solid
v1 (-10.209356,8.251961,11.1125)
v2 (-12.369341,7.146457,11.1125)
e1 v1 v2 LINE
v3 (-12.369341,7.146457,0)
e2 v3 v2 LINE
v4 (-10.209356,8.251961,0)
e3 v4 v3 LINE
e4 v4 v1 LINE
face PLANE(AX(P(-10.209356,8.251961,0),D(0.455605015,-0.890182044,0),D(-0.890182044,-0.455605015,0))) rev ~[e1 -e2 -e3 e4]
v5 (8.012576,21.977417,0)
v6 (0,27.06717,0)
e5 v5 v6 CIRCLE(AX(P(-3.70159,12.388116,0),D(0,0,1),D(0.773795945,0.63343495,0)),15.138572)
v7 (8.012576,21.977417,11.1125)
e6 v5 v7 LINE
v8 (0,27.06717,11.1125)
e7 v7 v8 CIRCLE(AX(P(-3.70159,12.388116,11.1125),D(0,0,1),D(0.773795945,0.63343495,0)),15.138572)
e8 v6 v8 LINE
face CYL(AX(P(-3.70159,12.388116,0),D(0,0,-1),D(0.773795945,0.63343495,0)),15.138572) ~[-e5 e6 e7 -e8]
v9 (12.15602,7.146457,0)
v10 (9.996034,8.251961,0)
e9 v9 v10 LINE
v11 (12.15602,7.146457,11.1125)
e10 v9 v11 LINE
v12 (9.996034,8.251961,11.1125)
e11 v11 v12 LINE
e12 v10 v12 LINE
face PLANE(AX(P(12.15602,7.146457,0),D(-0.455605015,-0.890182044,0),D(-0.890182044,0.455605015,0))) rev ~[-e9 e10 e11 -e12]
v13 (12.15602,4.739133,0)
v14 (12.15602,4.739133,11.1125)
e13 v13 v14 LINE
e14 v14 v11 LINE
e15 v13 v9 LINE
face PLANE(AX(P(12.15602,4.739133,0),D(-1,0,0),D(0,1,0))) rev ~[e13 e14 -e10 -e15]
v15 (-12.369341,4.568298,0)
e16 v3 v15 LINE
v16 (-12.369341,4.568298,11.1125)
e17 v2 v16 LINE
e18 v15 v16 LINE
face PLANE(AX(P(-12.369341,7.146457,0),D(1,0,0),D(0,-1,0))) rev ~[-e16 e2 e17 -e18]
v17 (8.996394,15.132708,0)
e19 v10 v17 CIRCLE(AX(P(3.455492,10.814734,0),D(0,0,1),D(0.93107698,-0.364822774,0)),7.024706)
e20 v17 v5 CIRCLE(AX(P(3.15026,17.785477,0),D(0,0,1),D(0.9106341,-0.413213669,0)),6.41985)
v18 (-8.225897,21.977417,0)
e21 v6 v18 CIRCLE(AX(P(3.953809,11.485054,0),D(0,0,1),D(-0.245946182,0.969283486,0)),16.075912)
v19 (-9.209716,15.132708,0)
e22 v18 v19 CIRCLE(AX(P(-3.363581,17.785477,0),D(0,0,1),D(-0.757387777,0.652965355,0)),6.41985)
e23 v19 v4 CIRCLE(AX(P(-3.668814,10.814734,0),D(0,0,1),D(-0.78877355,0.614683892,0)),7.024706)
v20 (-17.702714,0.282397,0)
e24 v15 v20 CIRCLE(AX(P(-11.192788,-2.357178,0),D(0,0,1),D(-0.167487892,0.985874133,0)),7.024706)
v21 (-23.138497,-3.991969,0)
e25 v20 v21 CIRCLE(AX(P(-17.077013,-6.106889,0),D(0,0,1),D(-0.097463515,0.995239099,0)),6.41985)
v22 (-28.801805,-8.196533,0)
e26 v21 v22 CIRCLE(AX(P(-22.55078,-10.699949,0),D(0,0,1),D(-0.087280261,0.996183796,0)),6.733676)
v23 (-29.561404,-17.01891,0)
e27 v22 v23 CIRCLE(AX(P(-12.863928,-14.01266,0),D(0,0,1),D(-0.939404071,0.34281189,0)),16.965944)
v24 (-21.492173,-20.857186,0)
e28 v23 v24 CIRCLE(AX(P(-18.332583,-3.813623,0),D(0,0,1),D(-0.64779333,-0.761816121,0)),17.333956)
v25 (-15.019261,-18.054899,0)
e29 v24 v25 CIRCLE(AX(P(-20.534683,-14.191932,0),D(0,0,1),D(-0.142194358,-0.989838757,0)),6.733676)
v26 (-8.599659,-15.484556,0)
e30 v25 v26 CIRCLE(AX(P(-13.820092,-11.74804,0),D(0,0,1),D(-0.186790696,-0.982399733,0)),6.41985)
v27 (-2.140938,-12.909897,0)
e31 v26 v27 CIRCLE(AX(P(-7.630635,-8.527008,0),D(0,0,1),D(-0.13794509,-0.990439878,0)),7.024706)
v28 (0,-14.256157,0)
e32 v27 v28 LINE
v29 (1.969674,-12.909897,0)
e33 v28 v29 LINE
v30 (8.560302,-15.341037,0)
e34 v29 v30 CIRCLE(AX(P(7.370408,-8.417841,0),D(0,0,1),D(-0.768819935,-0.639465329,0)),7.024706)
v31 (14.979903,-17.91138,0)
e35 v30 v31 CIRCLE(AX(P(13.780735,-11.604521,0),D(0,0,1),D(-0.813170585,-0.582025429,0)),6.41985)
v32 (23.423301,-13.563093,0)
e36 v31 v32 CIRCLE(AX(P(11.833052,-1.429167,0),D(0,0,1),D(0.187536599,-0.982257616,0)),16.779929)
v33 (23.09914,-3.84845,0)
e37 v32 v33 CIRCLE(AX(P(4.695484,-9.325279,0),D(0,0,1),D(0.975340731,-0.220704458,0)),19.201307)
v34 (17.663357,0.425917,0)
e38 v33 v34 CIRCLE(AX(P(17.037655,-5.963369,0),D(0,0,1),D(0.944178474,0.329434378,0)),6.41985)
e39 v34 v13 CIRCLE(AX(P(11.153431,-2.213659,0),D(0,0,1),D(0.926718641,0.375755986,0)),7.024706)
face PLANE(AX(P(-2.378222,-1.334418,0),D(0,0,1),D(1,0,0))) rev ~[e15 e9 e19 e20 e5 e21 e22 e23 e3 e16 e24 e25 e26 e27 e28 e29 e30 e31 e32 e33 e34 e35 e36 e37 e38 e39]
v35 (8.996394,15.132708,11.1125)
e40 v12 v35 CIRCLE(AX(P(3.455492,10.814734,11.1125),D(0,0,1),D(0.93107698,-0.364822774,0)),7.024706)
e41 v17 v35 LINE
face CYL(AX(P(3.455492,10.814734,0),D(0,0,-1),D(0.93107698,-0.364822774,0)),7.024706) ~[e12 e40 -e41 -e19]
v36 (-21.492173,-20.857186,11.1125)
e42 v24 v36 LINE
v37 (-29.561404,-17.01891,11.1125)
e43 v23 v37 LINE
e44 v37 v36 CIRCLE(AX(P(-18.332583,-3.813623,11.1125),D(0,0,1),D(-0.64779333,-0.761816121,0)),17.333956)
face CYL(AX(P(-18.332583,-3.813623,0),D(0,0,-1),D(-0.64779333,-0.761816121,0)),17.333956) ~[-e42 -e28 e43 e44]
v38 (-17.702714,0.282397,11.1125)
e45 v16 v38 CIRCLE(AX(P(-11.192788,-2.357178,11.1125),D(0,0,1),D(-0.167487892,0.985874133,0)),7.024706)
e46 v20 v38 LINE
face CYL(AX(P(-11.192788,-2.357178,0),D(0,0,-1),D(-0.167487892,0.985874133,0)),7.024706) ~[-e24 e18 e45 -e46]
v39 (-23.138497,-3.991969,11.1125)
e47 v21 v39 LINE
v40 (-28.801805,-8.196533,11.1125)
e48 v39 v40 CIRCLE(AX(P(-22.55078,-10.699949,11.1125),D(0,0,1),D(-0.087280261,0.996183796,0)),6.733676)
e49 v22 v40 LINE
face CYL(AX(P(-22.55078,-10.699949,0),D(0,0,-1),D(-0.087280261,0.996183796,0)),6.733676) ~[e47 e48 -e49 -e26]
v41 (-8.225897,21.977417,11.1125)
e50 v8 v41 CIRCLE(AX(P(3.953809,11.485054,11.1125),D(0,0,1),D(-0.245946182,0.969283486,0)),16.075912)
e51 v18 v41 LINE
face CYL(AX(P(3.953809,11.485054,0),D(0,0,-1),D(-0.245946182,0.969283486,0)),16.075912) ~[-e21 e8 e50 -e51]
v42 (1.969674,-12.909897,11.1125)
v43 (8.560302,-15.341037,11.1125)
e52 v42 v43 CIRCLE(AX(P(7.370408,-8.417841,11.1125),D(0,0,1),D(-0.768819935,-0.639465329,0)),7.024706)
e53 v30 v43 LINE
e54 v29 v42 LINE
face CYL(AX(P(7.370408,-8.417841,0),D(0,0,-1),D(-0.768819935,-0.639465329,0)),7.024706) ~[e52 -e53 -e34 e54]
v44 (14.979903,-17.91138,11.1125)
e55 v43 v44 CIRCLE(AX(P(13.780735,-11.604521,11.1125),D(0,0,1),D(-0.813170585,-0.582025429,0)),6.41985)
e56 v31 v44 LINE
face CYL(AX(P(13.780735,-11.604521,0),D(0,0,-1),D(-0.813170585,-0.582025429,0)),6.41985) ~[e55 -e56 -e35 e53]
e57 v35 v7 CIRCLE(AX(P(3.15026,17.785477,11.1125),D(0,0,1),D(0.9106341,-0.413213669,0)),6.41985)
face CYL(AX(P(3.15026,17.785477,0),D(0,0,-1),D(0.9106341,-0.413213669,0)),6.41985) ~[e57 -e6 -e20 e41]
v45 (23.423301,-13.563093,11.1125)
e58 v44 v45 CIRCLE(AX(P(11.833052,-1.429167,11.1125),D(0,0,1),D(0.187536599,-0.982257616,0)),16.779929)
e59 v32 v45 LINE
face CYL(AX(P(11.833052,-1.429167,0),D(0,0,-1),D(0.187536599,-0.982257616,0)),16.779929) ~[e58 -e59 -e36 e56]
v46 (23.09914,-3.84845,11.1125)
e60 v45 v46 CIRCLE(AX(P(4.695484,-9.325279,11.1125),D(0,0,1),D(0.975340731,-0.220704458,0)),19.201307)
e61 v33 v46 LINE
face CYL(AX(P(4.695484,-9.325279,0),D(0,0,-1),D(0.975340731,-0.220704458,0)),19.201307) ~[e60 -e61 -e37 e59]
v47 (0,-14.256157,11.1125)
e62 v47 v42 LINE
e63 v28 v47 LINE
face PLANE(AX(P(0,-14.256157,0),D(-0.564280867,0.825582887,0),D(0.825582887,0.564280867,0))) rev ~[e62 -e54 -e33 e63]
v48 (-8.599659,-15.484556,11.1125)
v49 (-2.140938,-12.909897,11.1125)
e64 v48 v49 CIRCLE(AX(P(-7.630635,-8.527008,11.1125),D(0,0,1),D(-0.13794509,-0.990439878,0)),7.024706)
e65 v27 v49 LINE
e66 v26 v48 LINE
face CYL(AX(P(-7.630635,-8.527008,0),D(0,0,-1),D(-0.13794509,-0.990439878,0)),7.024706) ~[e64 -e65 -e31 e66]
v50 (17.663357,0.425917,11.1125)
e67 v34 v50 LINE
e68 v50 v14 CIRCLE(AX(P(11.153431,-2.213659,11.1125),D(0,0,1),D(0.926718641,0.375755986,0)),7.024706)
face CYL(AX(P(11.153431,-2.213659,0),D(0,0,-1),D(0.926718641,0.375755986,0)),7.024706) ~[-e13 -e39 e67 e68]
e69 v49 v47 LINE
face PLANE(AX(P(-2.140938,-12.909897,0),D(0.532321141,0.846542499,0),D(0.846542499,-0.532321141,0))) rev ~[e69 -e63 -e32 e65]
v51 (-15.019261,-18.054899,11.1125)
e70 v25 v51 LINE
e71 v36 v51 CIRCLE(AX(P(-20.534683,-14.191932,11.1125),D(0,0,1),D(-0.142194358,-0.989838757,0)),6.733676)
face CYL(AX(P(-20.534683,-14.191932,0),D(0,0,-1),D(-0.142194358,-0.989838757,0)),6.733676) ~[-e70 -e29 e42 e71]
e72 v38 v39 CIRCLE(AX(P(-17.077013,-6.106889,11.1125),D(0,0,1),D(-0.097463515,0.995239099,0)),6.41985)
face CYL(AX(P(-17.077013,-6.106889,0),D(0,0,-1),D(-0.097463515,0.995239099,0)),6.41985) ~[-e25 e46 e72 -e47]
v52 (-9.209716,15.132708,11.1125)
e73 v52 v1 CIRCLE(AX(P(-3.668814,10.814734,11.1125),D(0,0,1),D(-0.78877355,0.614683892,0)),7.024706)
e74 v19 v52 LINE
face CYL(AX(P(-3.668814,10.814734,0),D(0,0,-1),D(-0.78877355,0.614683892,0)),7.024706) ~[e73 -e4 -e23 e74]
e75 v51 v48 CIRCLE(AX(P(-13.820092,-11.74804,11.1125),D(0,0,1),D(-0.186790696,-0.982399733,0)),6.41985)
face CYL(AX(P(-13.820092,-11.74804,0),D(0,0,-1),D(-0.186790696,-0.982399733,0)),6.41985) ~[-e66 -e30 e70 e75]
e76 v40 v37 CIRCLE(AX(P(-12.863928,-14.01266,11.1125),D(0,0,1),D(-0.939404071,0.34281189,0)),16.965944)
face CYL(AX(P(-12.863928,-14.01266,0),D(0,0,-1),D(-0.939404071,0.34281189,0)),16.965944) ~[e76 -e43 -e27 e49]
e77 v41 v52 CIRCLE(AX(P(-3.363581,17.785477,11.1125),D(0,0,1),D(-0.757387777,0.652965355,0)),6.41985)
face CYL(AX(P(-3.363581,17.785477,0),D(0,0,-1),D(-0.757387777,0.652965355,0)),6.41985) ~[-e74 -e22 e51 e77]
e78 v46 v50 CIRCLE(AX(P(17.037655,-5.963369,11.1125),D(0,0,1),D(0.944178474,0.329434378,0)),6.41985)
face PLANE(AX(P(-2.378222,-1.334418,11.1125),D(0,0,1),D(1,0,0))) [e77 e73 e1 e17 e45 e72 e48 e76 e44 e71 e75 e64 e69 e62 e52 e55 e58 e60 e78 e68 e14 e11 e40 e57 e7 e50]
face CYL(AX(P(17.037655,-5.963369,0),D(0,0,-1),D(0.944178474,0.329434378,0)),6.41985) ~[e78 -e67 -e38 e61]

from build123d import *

# Parameters (mm, degrees)
F1_DEPTH = 11.1125


# Not quite as in the source:
# - a length typed as a fraction of an inch, garbled in the dataset ("3 / 203.2 mm" for 3/8 in), is restored


with BuildPart() as f1:
    # F0 (on Top) → F1 (new body)
    with BuildSketch(Plane.XY):
        with BuildLine():
            ThreePointArc((0, 27.0671695471), (-4.5048536548, 25.1556778504), (-8.2258973271, 21.977417171))
            ThreePointArc((-8.2258973271, 21.977417171), (-9.7181261566, 18.698842434), (-9.2097157612, 15.1327075437))
            ThreePointArc((-9.2097157612, 15.1327075437), (-10.6205392688, 11.8246856933), (-10.2093555033, 8.2519613206))
            Line((-10.2093555033, 8.2519613206), (-12.369341217, 7.1464567445))
            Line((-12.369341217, 7.1464567445), (-12.369341217, 4.6386048198))
            Line((-12.369341217, 4.6386048198), (-12.369341217, 4.5682978211))
            ThreePointArc((-12.369341217, 4.5682978211), (-15.5930977879, 3.1185654947), (-17.7027139134, 0.2823972963))
            ThreePointArc((-17.7027139134, 0.2823972963), (-21.0452825194, -1.0603738309), (-23.1384971151, -3.9919692741))
            ThreePointArc((-23.1384971151, -3.9919692741), (-26.5647165348, -5.2934051439), (-28.80180468, -8.19653302))
            ThreePointArc((-28.80180468, -8.19653302), (-29.7673344436, -12.5572908836), (-29.5614041388, -17.0189104974))
            ThreePointArc((-29.5614041388, -17.0189104974), (-25.7783661022, -19.4669407743), (-21.4921734029, -20.8571857766))
            ThreePointArc((-21.4921734029, -20.8571857766), (-17.8594468391, -20.3713745504), (-15.0192606046, -18.054899429))
            ThreePointArc((-15.0192606046, -18.054899429), (-11.4338171794, -17.7079201351), (-8.5996589687, -15.484556372))
            ThreePointArc((-8.5996589687, -15.484556372), (-5.0294162563, -15.0523544446), (-2.1409380715, -12.9098966718))
            Line((-2.1409380715, -12.9098966718), (0, -14.2561570176))
            Line((0, -14.2561570176), (1.9696742658, -12.9098966718))
            ThreePointArc((1.9696742658, -12.9098966718), (4.9392756736, -15.0084468105), (8.560301624, -15.3410370587))
            ThreePointArc((8.560301624, -15.3410370587), (11.3944598347, -17.5644008218), (14.9799032599, -17.9113801157))
            ThreePointArc((14.9799032599, -17.9113801157), (19.5156578324, -16.3470620723), (23.423301056, -13.563092798))
            ThreePointArc((23.423301056, -13.563092798), (23.8861103651, -8.6849198531), (23.0991397704, -3.8484499608))
            ThreePointArc((23.0991397704, -3.8484499608), (21.0059251747, -0.9168545176), (17.6633565687, 0.4259166096))
            ThreePointArc((17.6633565687, 0.4259166096), (15.4847616458, 3.3168082822), (12.1560195839, 4.739132713))
            Line((12.1560195839, 4.739132713), (12.1560195839, 7.1464567445))
            Line((12.1560195839, 7.1464567445), (9.9960338703, 8.2519613206))
            ThreePointArc((9.9960338703, 8.2519613206), (10.4072176357, 11.8246856933), (8.9963941282, 15.1327075437))
            ThreePointArc((8.9963941282, 15.1327075437), (9.5048045235, 18.698842434), (8.012575694, 21.977417171))
            ThreePointArc((8.012575694, 21.977417171), (4.4155385291, 25.1665589), (0, 27.0671695471))
        make_face()
    extrude(amount=F1_DEPTH)


solid = f1.part
